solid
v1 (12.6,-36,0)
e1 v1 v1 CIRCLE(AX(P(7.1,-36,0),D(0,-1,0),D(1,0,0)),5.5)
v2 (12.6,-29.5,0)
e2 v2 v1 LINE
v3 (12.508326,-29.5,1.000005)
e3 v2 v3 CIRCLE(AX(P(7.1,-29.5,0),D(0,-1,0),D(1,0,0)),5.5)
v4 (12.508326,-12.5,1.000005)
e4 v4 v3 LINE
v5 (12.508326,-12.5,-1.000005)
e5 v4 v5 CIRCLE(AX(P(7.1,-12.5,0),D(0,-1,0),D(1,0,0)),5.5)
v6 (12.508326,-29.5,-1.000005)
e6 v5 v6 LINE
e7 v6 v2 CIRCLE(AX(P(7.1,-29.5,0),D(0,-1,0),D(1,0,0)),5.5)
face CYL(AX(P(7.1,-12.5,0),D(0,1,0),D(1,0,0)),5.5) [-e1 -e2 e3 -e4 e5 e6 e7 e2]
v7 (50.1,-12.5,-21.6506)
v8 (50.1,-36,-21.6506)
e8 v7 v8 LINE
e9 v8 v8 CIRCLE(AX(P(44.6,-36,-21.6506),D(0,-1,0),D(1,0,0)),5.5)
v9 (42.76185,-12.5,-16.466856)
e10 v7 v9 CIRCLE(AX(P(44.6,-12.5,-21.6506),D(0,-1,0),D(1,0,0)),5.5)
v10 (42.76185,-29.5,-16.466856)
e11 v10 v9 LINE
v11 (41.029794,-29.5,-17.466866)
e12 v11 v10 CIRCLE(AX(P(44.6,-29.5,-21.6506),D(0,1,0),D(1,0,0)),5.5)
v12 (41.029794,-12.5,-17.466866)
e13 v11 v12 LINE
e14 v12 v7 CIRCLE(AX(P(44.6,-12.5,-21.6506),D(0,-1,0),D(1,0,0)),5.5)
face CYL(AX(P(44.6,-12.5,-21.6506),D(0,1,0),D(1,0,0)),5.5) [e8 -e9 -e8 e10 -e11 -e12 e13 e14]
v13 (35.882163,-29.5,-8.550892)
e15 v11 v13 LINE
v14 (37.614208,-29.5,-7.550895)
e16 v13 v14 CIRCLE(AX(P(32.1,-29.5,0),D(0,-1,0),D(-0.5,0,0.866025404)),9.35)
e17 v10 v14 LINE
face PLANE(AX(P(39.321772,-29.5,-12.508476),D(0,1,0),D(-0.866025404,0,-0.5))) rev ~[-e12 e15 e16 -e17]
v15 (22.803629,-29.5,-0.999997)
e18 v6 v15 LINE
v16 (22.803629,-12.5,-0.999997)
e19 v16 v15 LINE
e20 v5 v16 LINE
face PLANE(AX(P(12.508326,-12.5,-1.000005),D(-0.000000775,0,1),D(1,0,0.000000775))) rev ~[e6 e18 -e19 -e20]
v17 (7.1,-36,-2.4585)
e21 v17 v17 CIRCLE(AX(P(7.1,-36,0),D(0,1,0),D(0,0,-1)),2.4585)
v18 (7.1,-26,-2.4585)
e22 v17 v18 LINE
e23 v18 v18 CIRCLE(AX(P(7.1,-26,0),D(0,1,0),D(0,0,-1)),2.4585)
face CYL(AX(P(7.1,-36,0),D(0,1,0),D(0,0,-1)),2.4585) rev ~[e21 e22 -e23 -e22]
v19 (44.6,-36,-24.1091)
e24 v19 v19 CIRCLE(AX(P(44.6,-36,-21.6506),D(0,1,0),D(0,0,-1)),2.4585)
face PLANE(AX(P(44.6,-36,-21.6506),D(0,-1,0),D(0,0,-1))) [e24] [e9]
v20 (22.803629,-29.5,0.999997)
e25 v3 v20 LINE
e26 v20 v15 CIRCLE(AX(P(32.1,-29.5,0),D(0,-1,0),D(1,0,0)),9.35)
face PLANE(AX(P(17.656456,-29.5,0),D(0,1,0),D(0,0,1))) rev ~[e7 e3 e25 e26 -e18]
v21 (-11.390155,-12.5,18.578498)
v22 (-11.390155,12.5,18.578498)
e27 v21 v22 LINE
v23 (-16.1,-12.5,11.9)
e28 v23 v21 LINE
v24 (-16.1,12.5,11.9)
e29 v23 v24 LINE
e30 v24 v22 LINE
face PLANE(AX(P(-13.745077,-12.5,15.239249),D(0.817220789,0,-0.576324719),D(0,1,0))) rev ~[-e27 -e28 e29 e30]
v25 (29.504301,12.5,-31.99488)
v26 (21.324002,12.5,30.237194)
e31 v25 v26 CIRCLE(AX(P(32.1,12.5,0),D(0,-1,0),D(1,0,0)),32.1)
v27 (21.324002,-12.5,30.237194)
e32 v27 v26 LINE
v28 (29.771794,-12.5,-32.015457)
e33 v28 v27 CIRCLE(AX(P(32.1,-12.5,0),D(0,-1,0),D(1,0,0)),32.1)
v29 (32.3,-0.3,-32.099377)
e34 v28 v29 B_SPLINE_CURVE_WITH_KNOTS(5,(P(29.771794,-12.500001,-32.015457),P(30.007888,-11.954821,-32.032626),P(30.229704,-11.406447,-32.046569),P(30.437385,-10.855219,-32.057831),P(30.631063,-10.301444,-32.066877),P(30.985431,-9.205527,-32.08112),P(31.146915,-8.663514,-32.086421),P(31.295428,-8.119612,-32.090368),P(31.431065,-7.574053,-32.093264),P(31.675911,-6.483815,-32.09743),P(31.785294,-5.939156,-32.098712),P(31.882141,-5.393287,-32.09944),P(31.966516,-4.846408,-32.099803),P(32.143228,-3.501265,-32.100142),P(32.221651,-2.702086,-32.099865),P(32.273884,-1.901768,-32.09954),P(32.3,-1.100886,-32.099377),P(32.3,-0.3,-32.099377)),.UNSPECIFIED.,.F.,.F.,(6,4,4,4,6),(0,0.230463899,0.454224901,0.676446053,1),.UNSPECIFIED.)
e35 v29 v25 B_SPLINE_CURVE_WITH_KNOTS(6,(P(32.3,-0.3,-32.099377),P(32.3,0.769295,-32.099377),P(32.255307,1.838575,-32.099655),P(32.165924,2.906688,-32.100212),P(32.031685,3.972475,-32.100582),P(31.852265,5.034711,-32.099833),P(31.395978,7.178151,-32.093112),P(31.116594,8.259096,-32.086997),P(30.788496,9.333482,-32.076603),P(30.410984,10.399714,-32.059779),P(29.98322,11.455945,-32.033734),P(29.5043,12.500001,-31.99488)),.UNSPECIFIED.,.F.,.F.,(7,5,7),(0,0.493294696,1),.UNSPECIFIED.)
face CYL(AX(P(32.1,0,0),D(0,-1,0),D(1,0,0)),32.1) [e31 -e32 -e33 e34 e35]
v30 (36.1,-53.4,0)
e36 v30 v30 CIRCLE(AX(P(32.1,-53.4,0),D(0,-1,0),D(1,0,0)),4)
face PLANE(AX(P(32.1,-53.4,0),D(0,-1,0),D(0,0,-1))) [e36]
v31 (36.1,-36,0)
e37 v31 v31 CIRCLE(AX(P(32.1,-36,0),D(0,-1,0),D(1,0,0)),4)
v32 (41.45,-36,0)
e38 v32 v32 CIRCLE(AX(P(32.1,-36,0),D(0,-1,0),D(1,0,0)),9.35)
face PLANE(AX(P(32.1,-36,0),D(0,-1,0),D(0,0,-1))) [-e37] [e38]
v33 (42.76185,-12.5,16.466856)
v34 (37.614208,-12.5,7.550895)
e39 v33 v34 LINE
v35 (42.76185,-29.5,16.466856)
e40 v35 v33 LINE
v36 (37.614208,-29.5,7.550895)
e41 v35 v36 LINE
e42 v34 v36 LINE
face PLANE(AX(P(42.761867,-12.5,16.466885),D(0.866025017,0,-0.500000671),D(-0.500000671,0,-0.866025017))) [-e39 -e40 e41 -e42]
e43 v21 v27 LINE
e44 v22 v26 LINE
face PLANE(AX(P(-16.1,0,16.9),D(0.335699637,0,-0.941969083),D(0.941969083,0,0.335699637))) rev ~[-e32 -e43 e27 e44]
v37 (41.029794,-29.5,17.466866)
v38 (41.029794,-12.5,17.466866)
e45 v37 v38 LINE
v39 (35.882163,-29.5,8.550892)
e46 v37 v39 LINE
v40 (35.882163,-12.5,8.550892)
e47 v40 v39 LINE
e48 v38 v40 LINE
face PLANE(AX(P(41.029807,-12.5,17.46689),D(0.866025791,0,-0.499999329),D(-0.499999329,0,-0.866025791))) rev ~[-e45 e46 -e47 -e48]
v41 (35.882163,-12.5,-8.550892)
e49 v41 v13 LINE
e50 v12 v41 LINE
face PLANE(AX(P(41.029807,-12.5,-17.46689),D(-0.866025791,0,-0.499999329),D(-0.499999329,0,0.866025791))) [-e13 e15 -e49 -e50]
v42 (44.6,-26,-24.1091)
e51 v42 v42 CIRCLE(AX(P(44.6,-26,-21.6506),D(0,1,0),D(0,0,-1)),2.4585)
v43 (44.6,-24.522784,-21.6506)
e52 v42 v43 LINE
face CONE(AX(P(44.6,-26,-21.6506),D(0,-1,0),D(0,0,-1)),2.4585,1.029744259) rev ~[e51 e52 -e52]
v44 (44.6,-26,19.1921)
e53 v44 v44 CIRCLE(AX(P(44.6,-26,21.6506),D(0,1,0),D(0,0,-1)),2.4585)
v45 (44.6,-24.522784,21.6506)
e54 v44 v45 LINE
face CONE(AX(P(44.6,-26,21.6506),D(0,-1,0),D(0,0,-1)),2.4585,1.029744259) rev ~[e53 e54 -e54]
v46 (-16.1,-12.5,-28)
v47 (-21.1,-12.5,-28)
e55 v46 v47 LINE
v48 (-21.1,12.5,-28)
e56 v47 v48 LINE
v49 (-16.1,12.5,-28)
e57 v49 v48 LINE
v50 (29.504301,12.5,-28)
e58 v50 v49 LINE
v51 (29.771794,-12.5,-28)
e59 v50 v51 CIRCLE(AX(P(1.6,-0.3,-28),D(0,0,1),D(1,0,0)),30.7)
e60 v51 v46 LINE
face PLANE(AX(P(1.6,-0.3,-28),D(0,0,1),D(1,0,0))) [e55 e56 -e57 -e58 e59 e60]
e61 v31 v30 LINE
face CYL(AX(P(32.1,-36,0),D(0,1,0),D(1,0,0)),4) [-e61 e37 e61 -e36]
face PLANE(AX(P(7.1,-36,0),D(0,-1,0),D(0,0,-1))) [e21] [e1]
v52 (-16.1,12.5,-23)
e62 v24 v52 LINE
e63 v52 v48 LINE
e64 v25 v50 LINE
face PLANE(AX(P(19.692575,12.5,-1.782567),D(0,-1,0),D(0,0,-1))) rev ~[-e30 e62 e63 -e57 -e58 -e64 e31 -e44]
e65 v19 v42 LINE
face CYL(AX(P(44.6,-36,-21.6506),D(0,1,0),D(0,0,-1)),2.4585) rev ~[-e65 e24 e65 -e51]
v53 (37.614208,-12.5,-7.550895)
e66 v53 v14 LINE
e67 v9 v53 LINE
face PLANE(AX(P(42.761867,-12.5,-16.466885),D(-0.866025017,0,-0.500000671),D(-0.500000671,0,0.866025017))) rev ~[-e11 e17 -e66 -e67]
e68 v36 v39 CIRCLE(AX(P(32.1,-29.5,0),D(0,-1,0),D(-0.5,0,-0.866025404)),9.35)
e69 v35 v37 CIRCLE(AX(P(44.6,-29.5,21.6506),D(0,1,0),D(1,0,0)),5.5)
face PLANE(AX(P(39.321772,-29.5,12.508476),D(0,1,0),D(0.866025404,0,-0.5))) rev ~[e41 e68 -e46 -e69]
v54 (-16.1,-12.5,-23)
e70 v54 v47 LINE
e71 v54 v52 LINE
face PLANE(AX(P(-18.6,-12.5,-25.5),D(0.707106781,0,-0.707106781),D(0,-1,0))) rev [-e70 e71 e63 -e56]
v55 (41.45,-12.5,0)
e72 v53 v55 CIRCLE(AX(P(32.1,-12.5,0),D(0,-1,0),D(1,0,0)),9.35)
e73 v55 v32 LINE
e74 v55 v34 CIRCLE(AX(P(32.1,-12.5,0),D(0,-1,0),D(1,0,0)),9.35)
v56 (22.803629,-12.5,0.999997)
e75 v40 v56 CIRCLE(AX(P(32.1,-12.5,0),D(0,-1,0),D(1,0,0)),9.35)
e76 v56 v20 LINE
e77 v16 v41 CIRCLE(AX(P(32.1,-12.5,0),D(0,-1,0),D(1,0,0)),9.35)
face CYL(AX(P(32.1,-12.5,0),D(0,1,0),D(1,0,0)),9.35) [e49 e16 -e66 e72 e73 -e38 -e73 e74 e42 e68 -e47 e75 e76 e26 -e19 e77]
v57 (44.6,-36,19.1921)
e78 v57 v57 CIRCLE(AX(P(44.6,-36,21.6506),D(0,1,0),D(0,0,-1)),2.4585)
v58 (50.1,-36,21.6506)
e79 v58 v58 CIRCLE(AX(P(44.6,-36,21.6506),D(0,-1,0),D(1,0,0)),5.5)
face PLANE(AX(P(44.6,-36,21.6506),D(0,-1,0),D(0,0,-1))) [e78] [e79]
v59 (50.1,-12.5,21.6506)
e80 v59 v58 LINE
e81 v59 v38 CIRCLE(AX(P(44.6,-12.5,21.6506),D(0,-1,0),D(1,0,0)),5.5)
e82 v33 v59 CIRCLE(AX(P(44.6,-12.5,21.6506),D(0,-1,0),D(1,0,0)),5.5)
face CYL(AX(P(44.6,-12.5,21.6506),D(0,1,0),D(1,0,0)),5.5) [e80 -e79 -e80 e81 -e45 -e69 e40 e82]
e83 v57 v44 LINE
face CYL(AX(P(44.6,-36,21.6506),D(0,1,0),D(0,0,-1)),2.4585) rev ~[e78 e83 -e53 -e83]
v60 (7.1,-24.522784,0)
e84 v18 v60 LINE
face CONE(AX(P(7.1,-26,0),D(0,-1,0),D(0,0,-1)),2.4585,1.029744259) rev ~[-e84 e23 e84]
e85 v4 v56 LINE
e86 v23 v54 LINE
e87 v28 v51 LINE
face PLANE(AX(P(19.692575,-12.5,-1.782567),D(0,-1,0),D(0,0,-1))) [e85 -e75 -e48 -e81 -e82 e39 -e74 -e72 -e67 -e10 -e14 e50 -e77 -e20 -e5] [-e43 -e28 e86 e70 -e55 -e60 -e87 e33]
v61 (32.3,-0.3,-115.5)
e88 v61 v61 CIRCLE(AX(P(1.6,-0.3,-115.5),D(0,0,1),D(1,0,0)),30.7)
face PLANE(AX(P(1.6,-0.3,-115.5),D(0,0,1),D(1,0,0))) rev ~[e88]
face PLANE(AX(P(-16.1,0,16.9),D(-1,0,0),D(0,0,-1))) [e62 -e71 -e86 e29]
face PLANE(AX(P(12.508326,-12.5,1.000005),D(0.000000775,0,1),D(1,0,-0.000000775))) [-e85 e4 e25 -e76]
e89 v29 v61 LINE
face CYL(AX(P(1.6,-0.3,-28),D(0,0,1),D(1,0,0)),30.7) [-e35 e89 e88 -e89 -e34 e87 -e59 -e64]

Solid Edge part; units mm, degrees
sketch "Sketch1" plane through (0, 0, 0) normal (0, -1, 0) x (1, 0, 0)
  line L0 (-16.1, 16.9) -> (-16.1, -29.1)
  line L1 (18.5501, -29.1) -> (-16.1, -29.1)
  line L2 (-16.1, 16.9) -> (21.324, 30.2372)
  arc A0 (18.5501, -29.1) -> (21.324, 30.2372) centre (32.1, 0) ccw
  dimension "D1" = 64.2
  dimension "D2" = 80.3
  dimension "D3" = 3
  dimension "D4" = 46
  dimension "D5" = 15.2
  dimension "D6" = 32.1
extrude "Extrusionsausprägung_1" add sketch "Sketch1" against normal blind 12.5 and the other way blind 12.5
sketch "Sketch2" plane through (24.05, -12.5, 0) normal (0, -1, 0) x (1, 0, 0)
  circle A0 centre (8.05, 0) radius 9.35
  circle A1 centre (20.55, 21.6506) radius 5.5
  circle A2 centre (20.55, -21.6506) radius 5.5
  circle A3 centre (-16.95, 0) radius 5.5
  dimension "D1" = 25
  dimension "D2" = 11
  dimension "D3" = 18.7
extrude "Extrusionsausprägung_2" add sketch "Sketch2" along normal blind 23.5
sketch "Sketch3" plane through (32.1, -36, 0) normal (0, -1, 0) x (1, 0, 0)
  circle A0 centre (0, 0) radius 4
  dimension "D1" = 8
extrude "Extrusionsausprägung_3" add sketch "Sketch3" along normal blind 17.4
sketch "Sketch4" plane through (24.05, -12.5, 0) normal (0, -1, 0) x (1, 0, 0)
  line L0 (-11.5417, 1) -> (-1.2464, 1)
  line L1 (-11.5417, -1) -> (-1.2464, -1)
  arc A0 (-11.5417, -1) -> (-11.5417, 1) centre (-16.95, 0) ccw
  arc A1 (-1.2464, 1) -> (-1.2464, -1) centre (8.05, 0) ccw
extrude "Extrusionsausprägung_4" add sketch "Sketch4" along normal blind 17
pattern_circular "Pattern1" count 3 over 360 about axis through (32.1, -12.5, 0) along (0, 1, 0) of "Extrusionsausprägung_4"
cosmetic_thread "Thread1" size "M8"
hole "Bohrung_1" at (7.1, -36, 0) direction (0, 1, 0) diameter 4.917 depth 10 tip angle 118 thread major 6 thread length 8
hole "Hole1" at (44.6, -36, 21.6506) direction (0, 1, 0) diameter 4.917 depth 10 tip angle 118 thread major 6 thread length 8
hole "Hole2" at (44.6, -36, -21.6506) direction (0, 1, 0) diameter 4.917 depth 10 tip angle 118 thread major 6 thread length 8
sketch "Sketch5" plane through (0, 0, -28) normal (0, 0, 1) x (1, 0, 0)
  circle A0 centre (1.6, -0.3) radius 30.7
  dimension "D1" = 5
  dimension "D2" = 61.4
extrude "Extrusionsausprägung_7" add sketch "Sketch5" against normal blind 87.5
chamfer "Fase_1" distance 5 angle 45 1 edges at (-16.1, 0, 16.9)
chamfer "Fase_2" distance 5 angle 45 1 edges at (-16.1, 0, -28)
